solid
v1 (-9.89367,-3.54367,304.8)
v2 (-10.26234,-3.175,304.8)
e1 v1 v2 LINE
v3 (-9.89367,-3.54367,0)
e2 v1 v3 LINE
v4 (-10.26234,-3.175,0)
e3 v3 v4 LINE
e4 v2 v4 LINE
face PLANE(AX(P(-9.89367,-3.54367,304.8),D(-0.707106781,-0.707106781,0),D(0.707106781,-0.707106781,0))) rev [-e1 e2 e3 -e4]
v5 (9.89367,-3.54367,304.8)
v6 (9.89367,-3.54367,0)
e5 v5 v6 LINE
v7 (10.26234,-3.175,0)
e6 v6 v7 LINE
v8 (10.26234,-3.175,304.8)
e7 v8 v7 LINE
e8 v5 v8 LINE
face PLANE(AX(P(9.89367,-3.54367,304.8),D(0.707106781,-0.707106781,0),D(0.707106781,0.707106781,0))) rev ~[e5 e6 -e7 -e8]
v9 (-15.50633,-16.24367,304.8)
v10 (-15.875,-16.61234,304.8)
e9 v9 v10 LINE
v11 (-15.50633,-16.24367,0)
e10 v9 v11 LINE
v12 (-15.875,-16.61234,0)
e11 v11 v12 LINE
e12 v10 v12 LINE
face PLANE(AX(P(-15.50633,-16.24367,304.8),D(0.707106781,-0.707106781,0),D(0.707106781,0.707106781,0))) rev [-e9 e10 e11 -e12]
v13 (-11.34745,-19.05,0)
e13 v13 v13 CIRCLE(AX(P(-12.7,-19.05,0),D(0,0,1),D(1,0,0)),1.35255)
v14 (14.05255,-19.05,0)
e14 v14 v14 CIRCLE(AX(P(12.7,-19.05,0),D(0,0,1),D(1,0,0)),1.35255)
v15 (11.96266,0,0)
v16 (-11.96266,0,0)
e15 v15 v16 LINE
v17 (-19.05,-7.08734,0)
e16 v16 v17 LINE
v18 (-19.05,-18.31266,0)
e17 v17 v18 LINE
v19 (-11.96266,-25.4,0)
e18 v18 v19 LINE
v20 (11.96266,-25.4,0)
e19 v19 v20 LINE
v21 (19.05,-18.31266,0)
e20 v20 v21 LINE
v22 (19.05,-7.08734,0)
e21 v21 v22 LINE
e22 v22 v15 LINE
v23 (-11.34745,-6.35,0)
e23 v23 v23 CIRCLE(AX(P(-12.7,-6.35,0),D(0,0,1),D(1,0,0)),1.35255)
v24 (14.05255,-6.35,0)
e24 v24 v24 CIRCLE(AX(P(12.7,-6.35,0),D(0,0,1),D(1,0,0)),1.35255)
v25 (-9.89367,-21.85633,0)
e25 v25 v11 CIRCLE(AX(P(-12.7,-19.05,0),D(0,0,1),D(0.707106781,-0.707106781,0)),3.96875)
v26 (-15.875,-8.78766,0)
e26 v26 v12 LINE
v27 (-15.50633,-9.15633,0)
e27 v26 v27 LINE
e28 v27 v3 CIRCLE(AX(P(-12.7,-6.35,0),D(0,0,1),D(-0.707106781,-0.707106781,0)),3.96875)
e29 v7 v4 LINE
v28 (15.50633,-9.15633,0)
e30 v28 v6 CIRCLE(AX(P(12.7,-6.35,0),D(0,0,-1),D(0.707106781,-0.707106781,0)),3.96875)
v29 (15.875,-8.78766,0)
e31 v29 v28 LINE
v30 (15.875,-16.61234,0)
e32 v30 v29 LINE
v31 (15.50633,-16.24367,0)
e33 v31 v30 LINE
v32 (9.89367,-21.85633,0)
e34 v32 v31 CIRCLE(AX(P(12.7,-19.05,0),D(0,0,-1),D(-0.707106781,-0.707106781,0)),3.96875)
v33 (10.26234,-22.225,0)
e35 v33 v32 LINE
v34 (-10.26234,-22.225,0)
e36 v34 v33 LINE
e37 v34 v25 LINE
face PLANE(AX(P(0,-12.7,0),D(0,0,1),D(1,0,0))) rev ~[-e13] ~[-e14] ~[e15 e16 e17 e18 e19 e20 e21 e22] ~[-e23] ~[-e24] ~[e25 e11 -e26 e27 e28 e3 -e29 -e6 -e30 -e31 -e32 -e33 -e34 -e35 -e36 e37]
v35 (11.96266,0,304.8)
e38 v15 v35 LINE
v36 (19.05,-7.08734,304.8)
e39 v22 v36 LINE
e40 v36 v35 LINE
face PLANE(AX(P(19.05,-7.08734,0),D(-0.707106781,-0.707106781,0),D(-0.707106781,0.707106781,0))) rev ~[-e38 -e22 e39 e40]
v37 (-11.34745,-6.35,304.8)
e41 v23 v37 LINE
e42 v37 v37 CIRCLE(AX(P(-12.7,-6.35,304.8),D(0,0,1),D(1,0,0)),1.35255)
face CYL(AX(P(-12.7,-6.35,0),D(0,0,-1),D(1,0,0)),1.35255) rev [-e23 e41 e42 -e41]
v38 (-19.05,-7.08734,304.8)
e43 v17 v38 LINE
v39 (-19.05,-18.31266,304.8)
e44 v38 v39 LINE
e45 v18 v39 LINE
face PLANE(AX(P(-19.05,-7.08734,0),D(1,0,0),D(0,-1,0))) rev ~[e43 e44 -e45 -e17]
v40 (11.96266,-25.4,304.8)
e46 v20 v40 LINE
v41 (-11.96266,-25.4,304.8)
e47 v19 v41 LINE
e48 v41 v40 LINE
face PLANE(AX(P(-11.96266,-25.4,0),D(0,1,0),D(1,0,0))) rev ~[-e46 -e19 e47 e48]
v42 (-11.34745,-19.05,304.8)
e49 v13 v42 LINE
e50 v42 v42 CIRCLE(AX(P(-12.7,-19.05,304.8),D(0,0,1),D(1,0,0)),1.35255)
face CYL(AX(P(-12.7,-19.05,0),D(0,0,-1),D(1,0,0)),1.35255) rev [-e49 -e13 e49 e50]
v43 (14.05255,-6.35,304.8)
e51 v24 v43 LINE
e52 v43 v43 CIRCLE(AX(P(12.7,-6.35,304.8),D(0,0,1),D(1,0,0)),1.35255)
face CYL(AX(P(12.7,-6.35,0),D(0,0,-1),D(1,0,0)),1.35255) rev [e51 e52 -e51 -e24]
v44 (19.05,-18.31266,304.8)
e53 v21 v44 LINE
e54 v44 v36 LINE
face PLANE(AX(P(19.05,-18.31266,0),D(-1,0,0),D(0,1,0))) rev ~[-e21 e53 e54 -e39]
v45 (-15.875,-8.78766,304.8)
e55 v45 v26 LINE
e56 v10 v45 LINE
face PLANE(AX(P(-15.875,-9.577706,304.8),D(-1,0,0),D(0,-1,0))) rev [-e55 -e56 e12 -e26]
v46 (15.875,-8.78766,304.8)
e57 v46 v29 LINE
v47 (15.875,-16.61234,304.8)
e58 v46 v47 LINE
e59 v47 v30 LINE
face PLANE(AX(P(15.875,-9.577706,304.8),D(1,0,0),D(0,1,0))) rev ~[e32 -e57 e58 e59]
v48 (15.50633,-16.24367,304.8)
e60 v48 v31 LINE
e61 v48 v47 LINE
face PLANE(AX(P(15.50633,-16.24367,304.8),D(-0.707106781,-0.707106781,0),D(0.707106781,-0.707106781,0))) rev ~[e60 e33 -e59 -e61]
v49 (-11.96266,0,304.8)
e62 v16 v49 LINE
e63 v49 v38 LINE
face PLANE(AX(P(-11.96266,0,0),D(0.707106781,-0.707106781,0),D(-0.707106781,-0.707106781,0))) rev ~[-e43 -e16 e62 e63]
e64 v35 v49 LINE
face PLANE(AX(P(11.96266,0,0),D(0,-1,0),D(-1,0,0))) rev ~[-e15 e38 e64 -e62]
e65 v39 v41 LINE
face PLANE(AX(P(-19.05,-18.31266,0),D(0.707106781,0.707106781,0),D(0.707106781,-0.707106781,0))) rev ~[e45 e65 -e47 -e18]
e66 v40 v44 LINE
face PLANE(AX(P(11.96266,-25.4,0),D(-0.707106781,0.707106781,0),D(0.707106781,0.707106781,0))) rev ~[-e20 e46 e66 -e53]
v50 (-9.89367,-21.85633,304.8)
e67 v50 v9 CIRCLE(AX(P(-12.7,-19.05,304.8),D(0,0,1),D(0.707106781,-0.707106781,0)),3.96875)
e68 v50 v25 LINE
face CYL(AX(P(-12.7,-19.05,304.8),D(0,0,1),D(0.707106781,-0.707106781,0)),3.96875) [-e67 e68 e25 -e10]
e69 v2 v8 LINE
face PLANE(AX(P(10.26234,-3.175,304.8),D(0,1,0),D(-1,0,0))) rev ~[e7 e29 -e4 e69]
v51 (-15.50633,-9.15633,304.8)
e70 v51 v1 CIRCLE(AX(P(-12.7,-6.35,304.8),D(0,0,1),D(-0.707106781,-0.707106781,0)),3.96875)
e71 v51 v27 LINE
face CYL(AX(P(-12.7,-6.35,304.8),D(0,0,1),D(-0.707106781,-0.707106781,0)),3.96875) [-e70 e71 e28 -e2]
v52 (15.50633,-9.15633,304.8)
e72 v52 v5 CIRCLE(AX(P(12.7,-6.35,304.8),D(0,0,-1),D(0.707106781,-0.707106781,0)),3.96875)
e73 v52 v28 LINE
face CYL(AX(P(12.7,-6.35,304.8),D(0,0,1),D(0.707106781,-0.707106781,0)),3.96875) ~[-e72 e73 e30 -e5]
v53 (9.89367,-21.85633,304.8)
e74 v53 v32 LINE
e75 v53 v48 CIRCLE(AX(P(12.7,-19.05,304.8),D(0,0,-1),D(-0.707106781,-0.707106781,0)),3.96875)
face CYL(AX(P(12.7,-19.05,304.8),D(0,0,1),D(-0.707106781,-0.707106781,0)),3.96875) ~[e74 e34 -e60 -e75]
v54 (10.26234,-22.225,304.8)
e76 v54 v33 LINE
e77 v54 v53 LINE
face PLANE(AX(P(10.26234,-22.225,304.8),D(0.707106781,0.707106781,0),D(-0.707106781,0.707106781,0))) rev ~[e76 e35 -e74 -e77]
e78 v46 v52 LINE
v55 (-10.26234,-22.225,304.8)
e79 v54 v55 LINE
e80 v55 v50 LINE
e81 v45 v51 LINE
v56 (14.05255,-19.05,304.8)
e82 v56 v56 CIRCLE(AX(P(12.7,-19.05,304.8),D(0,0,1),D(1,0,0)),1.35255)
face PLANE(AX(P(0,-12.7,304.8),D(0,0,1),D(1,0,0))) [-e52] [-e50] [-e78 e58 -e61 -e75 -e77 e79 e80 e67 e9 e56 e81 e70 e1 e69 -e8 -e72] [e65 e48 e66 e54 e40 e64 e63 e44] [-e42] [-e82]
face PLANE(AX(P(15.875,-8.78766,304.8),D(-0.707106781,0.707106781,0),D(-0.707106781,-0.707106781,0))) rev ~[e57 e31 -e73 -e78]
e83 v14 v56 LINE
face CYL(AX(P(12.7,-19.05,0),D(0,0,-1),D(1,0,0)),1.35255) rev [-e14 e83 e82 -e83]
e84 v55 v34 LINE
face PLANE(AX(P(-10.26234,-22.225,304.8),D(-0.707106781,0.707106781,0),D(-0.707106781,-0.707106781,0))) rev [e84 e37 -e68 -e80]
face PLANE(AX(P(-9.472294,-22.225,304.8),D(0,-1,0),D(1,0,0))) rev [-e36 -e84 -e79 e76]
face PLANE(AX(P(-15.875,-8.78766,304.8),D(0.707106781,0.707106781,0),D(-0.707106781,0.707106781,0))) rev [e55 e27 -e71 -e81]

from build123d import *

# Parameters (mm, degrees)
F0_R     = 1.35255
F1_DEPTH = 304.8
F2_T     = 3.175
F3_DEPTH = 3.175
F5_DEPTH = 304.8


# Not quite as in the source:
# - a pattern or mirror of a feature is missing from the dataset's text; its kind, count and spacing are read off the source's solid
# - a shell that OpenCascade refuses in one call is made with other operations: the cavity is built on its own and cut out


with BuildPart() as f1:
    # F0 (on Top) → F1 (new body)
    with BuildSketch(Plane.XY):
        Polygon((11.9626600757, 0), (-11.9626600757, 0), (-19.05, -7.0873399243), (-19.05, -18.3126600757), (-11.9626600757, -25.4), (11.9626600757, -25.4), (19.05, -18.3126600757), (19.05, -7.0873399243), align=None)
        with Locations((-12.7, -19.05)):
            Circle(F0_R, mode=Mode.SUBTRACT)
        with Locations((12.7, -19.05)):
            Circle(F0_R, mode=Mode.SUBTRACT)
        with Locations((-12.7, -6.35)):
            Circle(F0_R, mode=Mode.SUBTRACT)
        with Locations((12.7, -6.35)):
            Circle(F0_R, mode=Mode.SUBTRACT)
    extrude(amount=F1_DEPTH)

    # F2: shell of thickness 3.175, made by hand


with BuildPart() as f2_core1:
    # F2_t2: copy of F1
    add(f1.part)

    # the walls: a layer under each face that stays
    f2_faces = [f2_core1.faces().sort_by_distance(p)[0] for p in [
        (0, 0, 152.4),
        (-15.5063300378, -3.5436699622, 152.4),
        (-19.05, -12.7, 152.4),
        (-15.5063300378, -21.8563300378, 152.4),
        (0, -25.4, 152.4),
        (15.5063300378, -21.8563300378, 152.4),
        (19.05, -12.7, 152.4),
        (15.5063300378, -3.5436699622, 152.4),
        (-14.05255, -19.05, 152.4),
        (11.34745, -19.05, 152.4),
        (-14.05255, -6.35, 152.4),
        (11.34745, -6.35, 152.4),
        (0, -12.7, 0),
    ]]
    thicken(f2_faces, amount=-F2_T, mode=Mode.SUBTRACT)


with BuildPart() as f1_1:
    add(f1.part)

    # what is left inside the walls is the cavity
    f2_cavity = [f2_core1.part.solids().sort_by_distance(p)[0] for p in [
        (0, -3.20675, 204.258333),
    ]]
    add(f2_cavity, mode=Mode.SUBTRACT)

    # F3 (cut, through all): a face of the model
    f3_faces = [f1_1.faces().sort_by_distance(p)[0] for p in [
        (0, -12.7, 3.175),
    ]]
    extrude(f3_faces, amount=-F3_DEPTH, mode=Mode.SUBTRACT)

    # F4 (on face) → F5 (cut, through all)
    with BuildSketch(Plane.XY.offset(304.8)):
        with BuildLine():
            ThreePointArc((15.5063300378, -9.1563300378), (9.8936699622, -9.1563300378), (9.8936699622, -3.5436699622))
            Line((9.8936699622, -3.5436699622), (10.2623399243, -3.175))
            Line((10.2623399243, -3.175), (9.4722943129, -3.175))
            ThreePointArc((9.4722943129, -3.175), (9.4985386928, -9.5514613072), (15.875, -9.5777056871))
            Line((15.875, -9.5777056871), (15.875, -8.7876600757))
            Line((15.875, -8.7876600757), (15.5063300378, -9.1563300378))
        make_face()
        with BuildLine():
            Line((15.875, -16.6123399243), (15.875, -15.8222943129))
            ThreePointArc((15.875, -15.8222943129), (9.4985386928, -15.8485386928), (9.4722943129, -22.225))
            Line((9.4722943129, -22.225), (10.2623399243, -22.225))
            Line((10.2623399243, -22.225), (9.8936699622, -21.8563300378))
            ThreePointArc((9.8936699622, -21.8563300378), (9.8936699622, -16.2436699622), (15.5063300378, -16.2436699622))
            Line((15.5063300378, -16.2436699622), (15.875, -16.6123399243))
        make_face()
    f5 = extrude(amount=-F5_DEPTH, mode=Mode.SUBTRACT)

    # F5_copies: F5 across plane
    add(f5.mirror(Plane(origin=(0, 0, 0), x_dir=(0, 0, -1), z_dir=(-1, 0, 0))), mode=Mode.SUBTRACT)


solid = f1_1.part
